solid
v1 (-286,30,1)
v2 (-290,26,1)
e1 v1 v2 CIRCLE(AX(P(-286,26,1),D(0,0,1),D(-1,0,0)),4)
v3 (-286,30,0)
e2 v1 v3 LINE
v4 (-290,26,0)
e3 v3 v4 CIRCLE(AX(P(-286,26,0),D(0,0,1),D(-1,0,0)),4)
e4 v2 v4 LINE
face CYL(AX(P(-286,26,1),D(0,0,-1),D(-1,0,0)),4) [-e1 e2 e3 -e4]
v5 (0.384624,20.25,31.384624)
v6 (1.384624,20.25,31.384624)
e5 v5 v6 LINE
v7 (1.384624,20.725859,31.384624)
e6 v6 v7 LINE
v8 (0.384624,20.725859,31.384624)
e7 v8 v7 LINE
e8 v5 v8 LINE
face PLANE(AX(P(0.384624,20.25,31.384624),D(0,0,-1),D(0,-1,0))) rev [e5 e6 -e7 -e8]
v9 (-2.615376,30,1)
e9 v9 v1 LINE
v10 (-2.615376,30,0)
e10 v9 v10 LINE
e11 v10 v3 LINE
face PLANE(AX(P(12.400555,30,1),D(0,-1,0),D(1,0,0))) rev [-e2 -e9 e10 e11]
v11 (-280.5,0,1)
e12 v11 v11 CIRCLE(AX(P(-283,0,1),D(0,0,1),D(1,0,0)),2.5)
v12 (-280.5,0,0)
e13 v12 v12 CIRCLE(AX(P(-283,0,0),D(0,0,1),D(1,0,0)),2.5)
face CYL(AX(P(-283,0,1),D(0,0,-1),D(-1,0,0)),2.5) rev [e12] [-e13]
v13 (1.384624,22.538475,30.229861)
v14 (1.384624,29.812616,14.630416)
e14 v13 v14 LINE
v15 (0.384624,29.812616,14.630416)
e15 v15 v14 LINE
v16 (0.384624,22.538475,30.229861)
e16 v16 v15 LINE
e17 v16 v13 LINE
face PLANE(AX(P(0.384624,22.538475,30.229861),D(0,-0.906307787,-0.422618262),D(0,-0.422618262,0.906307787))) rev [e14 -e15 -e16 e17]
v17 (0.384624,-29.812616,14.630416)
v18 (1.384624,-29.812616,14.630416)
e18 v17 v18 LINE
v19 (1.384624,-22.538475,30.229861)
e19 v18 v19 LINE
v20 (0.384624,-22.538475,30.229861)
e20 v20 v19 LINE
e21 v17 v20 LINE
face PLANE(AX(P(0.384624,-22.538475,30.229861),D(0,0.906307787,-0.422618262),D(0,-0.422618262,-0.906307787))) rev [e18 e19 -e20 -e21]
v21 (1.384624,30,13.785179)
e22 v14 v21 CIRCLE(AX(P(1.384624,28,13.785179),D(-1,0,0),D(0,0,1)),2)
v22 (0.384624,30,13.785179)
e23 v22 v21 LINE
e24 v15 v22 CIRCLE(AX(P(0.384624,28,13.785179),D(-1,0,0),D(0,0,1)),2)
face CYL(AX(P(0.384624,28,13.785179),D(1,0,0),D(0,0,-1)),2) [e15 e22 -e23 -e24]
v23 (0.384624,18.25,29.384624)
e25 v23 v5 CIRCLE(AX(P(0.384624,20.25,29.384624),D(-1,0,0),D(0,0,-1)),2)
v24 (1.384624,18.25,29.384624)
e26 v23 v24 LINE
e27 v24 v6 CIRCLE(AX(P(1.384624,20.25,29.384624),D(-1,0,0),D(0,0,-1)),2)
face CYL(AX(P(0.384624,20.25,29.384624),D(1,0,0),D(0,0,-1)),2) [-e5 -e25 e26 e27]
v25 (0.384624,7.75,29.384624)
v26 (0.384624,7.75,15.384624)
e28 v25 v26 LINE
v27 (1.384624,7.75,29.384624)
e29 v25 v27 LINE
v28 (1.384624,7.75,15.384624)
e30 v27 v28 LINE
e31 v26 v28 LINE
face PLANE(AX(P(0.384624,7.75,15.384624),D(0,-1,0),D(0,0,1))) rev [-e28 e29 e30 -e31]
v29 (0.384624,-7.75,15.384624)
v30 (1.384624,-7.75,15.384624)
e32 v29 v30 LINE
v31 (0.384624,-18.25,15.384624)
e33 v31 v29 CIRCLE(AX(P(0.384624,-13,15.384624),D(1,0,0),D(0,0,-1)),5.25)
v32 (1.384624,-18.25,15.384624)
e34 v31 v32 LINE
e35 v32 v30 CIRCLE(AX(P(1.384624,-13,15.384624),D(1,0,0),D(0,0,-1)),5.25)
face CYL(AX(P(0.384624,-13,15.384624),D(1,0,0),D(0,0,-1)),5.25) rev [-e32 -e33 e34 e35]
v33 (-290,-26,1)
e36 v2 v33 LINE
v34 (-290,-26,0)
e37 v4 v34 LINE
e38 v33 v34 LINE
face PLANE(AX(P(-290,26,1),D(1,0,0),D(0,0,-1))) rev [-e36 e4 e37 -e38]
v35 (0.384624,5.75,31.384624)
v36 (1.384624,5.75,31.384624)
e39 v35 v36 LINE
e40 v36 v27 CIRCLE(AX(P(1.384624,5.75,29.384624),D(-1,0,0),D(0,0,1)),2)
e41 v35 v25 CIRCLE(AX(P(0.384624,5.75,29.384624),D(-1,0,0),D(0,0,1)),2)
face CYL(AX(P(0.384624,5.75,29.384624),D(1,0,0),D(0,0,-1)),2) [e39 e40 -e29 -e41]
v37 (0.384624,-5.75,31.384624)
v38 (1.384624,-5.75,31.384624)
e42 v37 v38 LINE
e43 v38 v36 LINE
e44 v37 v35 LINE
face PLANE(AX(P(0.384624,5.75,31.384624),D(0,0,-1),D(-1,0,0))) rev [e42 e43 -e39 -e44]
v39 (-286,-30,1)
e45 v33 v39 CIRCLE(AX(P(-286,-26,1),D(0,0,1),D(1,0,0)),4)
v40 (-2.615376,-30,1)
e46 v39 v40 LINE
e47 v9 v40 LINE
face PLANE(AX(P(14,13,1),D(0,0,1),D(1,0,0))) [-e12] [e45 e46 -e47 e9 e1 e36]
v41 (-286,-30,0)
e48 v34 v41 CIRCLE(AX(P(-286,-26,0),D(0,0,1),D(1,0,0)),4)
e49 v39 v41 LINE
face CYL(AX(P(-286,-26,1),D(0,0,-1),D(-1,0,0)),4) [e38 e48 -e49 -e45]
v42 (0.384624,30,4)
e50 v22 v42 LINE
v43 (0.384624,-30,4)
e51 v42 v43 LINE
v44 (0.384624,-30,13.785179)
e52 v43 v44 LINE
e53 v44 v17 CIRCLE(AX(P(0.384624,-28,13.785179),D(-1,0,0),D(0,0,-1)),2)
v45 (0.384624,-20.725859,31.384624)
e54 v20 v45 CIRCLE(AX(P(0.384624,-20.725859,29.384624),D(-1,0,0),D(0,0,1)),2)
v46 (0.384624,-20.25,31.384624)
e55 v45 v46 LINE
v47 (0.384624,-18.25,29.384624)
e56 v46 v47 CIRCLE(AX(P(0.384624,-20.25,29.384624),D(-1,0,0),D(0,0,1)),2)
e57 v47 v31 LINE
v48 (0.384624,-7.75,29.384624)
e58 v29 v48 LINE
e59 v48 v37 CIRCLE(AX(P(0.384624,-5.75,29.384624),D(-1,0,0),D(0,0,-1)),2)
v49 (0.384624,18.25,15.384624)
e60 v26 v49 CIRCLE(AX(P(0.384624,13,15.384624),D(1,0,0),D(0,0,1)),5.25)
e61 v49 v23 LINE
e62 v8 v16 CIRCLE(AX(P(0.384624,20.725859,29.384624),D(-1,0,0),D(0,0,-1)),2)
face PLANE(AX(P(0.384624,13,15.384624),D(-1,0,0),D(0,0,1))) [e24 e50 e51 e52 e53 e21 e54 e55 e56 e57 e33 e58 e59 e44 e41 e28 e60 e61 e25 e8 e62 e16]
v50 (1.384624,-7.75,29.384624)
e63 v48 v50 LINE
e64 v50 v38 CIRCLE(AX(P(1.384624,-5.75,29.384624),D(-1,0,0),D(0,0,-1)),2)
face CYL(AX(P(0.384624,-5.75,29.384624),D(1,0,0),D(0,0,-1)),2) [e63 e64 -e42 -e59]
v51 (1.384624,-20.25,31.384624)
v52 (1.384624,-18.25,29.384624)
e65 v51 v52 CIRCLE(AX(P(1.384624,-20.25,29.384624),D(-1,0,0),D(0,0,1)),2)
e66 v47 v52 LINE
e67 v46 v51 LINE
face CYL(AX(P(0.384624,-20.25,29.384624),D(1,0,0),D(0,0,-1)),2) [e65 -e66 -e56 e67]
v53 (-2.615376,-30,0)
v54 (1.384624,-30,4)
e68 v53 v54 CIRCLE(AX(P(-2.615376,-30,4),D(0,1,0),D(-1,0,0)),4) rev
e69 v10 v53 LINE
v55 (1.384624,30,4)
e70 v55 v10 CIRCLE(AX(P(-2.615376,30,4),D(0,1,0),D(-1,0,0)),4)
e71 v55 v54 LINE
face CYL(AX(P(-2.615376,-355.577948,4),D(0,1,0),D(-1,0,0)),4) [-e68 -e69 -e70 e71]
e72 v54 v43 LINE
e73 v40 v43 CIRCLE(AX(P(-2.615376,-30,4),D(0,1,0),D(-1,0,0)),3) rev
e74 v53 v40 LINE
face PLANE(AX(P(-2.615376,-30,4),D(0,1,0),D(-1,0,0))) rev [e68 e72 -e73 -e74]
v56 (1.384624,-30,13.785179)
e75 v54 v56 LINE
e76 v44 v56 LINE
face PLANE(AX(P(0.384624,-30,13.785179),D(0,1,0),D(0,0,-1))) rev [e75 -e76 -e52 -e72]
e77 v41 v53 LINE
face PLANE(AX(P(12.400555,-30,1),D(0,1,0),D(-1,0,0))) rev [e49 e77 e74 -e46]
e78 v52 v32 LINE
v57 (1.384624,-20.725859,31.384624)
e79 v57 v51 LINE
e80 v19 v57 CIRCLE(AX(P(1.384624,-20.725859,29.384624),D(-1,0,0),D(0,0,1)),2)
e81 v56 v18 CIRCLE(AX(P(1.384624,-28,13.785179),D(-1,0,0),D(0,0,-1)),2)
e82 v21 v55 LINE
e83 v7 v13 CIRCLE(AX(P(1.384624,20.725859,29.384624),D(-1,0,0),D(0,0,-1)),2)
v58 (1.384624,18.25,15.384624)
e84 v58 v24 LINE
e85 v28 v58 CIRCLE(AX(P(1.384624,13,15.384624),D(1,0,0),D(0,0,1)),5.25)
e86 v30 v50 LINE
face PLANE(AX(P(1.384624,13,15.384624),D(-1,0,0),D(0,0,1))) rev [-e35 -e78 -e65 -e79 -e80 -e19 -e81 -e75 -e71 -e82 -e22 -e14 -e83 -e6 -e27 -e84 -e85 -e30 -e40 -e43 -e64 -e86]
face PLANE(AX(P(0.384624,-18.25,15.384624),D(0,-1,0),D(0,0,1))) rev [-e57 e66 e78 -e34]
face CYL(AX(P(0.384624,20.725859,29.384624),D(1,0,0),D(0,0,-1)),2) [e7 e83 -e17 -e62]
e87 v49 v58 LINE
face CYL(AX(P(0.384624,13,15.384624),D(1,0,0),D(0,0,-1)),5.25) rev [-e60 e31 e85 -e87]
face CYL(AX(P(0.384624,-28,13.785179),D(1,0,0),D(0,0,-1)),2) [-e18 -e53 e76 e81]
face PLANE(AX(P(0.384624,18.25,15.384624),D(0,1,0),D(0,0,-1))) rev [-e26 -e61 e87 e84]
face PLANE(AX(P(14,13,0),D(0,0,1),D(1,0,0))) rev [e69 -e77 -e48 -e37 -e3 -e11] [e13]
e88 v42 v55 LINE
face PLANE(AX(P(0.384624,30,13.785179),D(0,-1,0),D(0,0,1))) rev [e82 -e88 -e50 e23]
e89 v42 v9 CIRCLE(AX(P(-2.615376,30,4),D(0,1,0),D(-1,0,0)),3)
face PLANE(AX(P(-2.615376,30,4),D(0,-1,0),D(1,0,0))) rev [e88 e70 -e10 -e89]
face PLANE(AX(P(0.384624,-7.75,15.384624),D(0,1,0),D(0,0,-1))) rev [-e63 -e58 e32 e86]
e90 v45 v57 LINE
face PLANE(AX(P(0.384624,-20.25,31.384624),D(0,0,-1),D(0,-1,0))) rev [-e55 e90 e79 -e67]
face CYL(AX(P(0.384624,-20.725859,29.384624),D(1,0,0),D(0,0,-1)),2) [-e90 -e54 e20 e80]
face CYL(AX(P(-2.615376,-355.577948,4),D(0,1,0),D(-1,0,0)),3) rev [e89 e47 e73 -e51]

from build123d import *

# Parameters (mm, degrees)
SKETCH1_R                = 2.5
BASE_EXTRUDE_DEPTH       = 1
PROCESS_BENDS1_START     = 0.384624116
PROCESS_BENDS1_OUTLINE_W = 60
PROCESS_BENDS1_OUTLINE_H = 1
PROCESS_BENDS1_DEPTH     = 29.615375884
PROCESS_BENDS1_START_2   = -1.84192973
PROCESS_BENDS1_2_DEPTH   = 3.226553846
PROCESS_BENDS1_START_3   = -30
PROCESS_BENDS1_3_DEPTH   = 61
PROCESS_BENDS1_4_DEPTH   = 60


with BuildPart() as part:
    # Sketch1 → Base-Extrude (new body)
    with BuildSketch(Plane.XY):
        with BuildLine():
            Line((14, 18.25), (28, 18.25))
            ThreePointArc((28, 18.25), (29.414213562, 18.835786438), (30, 20.25))
            Line((30, 20.25), (30, 20.725859478))
            ThreePointArc((30, 20.725859478), (29.686782892, 21.800458695), (28.845236523, 22.538475052))
            Line((28.845236523, 22.538475052), (13.245791834, 29.812615574))
            ThreePointArc((13.245791834, 29.812615574), (12.833434539, 29.952592014), (12.400555311, 30))
            Line((12.400555311, 30), (-286, 30))
            ThreePointArc((-286, 30), (-288.828427125, 28.828427125), (-290, 26))
            Line((-290, 26), (-290, -26))
            ThreePointArc((-290, -26), (-288.828427125, -28.828427125), (-286, -30))
            Line((-286, -30), (12.400555311, -30))
            ThreePointArc((12.400555311, -30), (12.833434539, -29.952592014), (13.245791834, -29.812615574))
            Line((13.245791834, -29.812615574), (28.845236523, -22.538475052))
            ThreePointArc((28.845236523, -22.538475052), (29.686782892, -21.800458695), (30, -20.725859478))
            Line((30, -20.725859478), (30, -20.25))
            ThreePointArc((30, -20.25), (29.414213562, -18.835786438), (28, -18.25))
            Line((28, -18.25), (14, -18.25))
            ThreePointArc((14, -18.25), (8.75, -13), (14, -7.75))
            Line((14, -7.75), (28, -7.75))
            ThreePointArc((28, -7.75), (29.414213562, -7.164213562), (30, -5.75))
            Line((30, -5.75), (30, 5.75))
            ThreePointArc((30, 5.75), (29.414213562, 7.164213562), (28, 7.75))
            Line((28, 7.75), (14, 7.75))
            ThreePointArc((14, 7.75), (8.75, 13), (14, 18.25))
        make_face()
        with Locations((-283, 0)):
            Circle(SKETCH1_R, mode=Mode.SUBTRACT)
    extrude(amount=BASE_EXTRUDE_DEPTH)

    # Process-Bends1: read off the stored shape, not the designer's step
    # Process-Bends1 outline → Process-Bends1 (cut)
    with BuildSketch(Plane.YZ.offset(PROCESS_BENDS1_START)):
        with Locations((0, 0.5)):
            Rectangle(PROCESS_BENDS1_OUTLINE_W, PROCESS_BENDS1_OUTLINE_H)
    extrude(amount=PROCESS_BENDS1_DEPTH, mode=Mode.SUBTRACT)

    # Process-Bends1 2 outline → Process-Bends1 2 (add)
    with BuildSketch(Plane.YZ.offset(PROCESS_BENDS1_START_2)):
        with BuildLine():
            ThreePointArc((18.25, 15.384624116), (13, 10.134624116), (7.75, 15.384624116))
            Line((7.75, 15.384624116), (7.75, 29.384624116))
            ThreePointArc((7.75, 29.384624116), (7.164213562, 30.798837678), (5.75, 31.384624116))
            Line((5.75, 31.384624116), (-5.75, 31.384624116))
            ThreePointArc((-5.75, 31.384624116), (-7.164213562, 30.798837678), (-7.75, 29.384624116))
            Line((-7.75, 29.384624116), (-7.75, 15.384624116))
            ThreePointArc((-7.75, 15.384624116), (-13, 10.134624116), (-18.25, 15.384624116))
            Line((-18.25, 15.384624116), (-18.25, 29.384624116))
            ThreePointArc((-18.25, 29.384624116), (-18.835786438, 30.798837678), (-20.25, 31.384624116))
            Line((-20.25, 31.384624116), (-20.725859478, 31.384624116))
            ThreePointArc((-20.725859478, 31.384624116), (-21.800458695, 31.071407008), (-22.538475052, 30.229860639))
            Line((-22.538475052, 30.229860639), (-29.812615574, 14.63041595))
            ThreePointArc((-29.812615574, 14.63041595), (-29.952592014, 14.218058655), (-30, 13.785179427))
            Line((-30, 13.785179427), (-30, 1))
            Line((-30, 1), (30, 1))
            Line((30, 1), (30, 13.785179427))
            ThreePointArc((30, 13.785179427), (29.952592014, 14.218058655), (29.812615574, 14.63041595))
            Line((29.812615574, 14.63041595), (22.538475052, 30.229860639))
            ThreePointArc((22.538475052, 30.229860639), (21.800458695, 31.071407008), (20.725859478, 31.384624116))
            Line((20.725859478, 31.384624116), (20.25, 31.384624116))
            ThreePointArc((20.25, 31.384624116), (18.835786438, 30.798837678), (18.25, 29.384624116))
            Line((18.25, 29.384624116), (18.25, 15.384624116))
        make_face()
    extrude(amount=PROCESS_BENDS1_2_DEPTH)

    # Process-Bends1 3 outline → Process-Bends1 3 (cut)
    with BuildSketch(Plane(origin=(0, 0, 0), x_dir=(1, 0, 0), z_dir=(0, 1, 0)).offset(PROCESS_BENDS1_START_3)):
        with BuildLine():
            ThreePointArc((-2.615375884, 0), (0.213051241, -1.171572875), (1.384624116, -4))
            Line((1.384624116, -4), (1.384624116, -1))
            Line((1.384624116, -1), (0.384624116, -1))
            Line((0.384624116, -1), (0.384624116, 0))
            Line((0.384624116, 0), (-2.615375884, 0))
        make_face()
        with BuildLine():
            Line((0.384624116, -31.384624116), (0.384624116, -4))
            ThreePointArc((0.384624116, -4), (-0.236264867, -2.172479612), (-1.84192973, -1.101417407))
            Line((-1.84192973, -1.101417407), (-1.84192973, -31.384624116))
            Line((-1.84192973, -31.384624116), (0.384624116, -31.384624116))
        make_face()
    extrude(amount=PROCESS_BENDS1_3_DEPTH, mode=Mode.SUBTRACT)

    # Process-Bends1 4 outline → Process-Bends1 4 (add)
    with BuildSketch(Plane(origin=(0, 0, 0), x_dir=(1, 0, 0), z_dir=(0, 1, 0)).offset(PROCESS_BENDS1_START_3)):
        with BuildLine():
            ThreePointArc((-2.615375884, -1), (-2.22534241, -1.025462408), (-1.84192973, -1.101417407))
            Line((-1.84192973, -1.101417407), (-1.84192973, -1))
            Line((-1.84192973, -1), (-2.615375884, -1))
        make_face()
    extrude(amount=PROCESS_BENDS1_4_DEPTH)


solid = part.part
